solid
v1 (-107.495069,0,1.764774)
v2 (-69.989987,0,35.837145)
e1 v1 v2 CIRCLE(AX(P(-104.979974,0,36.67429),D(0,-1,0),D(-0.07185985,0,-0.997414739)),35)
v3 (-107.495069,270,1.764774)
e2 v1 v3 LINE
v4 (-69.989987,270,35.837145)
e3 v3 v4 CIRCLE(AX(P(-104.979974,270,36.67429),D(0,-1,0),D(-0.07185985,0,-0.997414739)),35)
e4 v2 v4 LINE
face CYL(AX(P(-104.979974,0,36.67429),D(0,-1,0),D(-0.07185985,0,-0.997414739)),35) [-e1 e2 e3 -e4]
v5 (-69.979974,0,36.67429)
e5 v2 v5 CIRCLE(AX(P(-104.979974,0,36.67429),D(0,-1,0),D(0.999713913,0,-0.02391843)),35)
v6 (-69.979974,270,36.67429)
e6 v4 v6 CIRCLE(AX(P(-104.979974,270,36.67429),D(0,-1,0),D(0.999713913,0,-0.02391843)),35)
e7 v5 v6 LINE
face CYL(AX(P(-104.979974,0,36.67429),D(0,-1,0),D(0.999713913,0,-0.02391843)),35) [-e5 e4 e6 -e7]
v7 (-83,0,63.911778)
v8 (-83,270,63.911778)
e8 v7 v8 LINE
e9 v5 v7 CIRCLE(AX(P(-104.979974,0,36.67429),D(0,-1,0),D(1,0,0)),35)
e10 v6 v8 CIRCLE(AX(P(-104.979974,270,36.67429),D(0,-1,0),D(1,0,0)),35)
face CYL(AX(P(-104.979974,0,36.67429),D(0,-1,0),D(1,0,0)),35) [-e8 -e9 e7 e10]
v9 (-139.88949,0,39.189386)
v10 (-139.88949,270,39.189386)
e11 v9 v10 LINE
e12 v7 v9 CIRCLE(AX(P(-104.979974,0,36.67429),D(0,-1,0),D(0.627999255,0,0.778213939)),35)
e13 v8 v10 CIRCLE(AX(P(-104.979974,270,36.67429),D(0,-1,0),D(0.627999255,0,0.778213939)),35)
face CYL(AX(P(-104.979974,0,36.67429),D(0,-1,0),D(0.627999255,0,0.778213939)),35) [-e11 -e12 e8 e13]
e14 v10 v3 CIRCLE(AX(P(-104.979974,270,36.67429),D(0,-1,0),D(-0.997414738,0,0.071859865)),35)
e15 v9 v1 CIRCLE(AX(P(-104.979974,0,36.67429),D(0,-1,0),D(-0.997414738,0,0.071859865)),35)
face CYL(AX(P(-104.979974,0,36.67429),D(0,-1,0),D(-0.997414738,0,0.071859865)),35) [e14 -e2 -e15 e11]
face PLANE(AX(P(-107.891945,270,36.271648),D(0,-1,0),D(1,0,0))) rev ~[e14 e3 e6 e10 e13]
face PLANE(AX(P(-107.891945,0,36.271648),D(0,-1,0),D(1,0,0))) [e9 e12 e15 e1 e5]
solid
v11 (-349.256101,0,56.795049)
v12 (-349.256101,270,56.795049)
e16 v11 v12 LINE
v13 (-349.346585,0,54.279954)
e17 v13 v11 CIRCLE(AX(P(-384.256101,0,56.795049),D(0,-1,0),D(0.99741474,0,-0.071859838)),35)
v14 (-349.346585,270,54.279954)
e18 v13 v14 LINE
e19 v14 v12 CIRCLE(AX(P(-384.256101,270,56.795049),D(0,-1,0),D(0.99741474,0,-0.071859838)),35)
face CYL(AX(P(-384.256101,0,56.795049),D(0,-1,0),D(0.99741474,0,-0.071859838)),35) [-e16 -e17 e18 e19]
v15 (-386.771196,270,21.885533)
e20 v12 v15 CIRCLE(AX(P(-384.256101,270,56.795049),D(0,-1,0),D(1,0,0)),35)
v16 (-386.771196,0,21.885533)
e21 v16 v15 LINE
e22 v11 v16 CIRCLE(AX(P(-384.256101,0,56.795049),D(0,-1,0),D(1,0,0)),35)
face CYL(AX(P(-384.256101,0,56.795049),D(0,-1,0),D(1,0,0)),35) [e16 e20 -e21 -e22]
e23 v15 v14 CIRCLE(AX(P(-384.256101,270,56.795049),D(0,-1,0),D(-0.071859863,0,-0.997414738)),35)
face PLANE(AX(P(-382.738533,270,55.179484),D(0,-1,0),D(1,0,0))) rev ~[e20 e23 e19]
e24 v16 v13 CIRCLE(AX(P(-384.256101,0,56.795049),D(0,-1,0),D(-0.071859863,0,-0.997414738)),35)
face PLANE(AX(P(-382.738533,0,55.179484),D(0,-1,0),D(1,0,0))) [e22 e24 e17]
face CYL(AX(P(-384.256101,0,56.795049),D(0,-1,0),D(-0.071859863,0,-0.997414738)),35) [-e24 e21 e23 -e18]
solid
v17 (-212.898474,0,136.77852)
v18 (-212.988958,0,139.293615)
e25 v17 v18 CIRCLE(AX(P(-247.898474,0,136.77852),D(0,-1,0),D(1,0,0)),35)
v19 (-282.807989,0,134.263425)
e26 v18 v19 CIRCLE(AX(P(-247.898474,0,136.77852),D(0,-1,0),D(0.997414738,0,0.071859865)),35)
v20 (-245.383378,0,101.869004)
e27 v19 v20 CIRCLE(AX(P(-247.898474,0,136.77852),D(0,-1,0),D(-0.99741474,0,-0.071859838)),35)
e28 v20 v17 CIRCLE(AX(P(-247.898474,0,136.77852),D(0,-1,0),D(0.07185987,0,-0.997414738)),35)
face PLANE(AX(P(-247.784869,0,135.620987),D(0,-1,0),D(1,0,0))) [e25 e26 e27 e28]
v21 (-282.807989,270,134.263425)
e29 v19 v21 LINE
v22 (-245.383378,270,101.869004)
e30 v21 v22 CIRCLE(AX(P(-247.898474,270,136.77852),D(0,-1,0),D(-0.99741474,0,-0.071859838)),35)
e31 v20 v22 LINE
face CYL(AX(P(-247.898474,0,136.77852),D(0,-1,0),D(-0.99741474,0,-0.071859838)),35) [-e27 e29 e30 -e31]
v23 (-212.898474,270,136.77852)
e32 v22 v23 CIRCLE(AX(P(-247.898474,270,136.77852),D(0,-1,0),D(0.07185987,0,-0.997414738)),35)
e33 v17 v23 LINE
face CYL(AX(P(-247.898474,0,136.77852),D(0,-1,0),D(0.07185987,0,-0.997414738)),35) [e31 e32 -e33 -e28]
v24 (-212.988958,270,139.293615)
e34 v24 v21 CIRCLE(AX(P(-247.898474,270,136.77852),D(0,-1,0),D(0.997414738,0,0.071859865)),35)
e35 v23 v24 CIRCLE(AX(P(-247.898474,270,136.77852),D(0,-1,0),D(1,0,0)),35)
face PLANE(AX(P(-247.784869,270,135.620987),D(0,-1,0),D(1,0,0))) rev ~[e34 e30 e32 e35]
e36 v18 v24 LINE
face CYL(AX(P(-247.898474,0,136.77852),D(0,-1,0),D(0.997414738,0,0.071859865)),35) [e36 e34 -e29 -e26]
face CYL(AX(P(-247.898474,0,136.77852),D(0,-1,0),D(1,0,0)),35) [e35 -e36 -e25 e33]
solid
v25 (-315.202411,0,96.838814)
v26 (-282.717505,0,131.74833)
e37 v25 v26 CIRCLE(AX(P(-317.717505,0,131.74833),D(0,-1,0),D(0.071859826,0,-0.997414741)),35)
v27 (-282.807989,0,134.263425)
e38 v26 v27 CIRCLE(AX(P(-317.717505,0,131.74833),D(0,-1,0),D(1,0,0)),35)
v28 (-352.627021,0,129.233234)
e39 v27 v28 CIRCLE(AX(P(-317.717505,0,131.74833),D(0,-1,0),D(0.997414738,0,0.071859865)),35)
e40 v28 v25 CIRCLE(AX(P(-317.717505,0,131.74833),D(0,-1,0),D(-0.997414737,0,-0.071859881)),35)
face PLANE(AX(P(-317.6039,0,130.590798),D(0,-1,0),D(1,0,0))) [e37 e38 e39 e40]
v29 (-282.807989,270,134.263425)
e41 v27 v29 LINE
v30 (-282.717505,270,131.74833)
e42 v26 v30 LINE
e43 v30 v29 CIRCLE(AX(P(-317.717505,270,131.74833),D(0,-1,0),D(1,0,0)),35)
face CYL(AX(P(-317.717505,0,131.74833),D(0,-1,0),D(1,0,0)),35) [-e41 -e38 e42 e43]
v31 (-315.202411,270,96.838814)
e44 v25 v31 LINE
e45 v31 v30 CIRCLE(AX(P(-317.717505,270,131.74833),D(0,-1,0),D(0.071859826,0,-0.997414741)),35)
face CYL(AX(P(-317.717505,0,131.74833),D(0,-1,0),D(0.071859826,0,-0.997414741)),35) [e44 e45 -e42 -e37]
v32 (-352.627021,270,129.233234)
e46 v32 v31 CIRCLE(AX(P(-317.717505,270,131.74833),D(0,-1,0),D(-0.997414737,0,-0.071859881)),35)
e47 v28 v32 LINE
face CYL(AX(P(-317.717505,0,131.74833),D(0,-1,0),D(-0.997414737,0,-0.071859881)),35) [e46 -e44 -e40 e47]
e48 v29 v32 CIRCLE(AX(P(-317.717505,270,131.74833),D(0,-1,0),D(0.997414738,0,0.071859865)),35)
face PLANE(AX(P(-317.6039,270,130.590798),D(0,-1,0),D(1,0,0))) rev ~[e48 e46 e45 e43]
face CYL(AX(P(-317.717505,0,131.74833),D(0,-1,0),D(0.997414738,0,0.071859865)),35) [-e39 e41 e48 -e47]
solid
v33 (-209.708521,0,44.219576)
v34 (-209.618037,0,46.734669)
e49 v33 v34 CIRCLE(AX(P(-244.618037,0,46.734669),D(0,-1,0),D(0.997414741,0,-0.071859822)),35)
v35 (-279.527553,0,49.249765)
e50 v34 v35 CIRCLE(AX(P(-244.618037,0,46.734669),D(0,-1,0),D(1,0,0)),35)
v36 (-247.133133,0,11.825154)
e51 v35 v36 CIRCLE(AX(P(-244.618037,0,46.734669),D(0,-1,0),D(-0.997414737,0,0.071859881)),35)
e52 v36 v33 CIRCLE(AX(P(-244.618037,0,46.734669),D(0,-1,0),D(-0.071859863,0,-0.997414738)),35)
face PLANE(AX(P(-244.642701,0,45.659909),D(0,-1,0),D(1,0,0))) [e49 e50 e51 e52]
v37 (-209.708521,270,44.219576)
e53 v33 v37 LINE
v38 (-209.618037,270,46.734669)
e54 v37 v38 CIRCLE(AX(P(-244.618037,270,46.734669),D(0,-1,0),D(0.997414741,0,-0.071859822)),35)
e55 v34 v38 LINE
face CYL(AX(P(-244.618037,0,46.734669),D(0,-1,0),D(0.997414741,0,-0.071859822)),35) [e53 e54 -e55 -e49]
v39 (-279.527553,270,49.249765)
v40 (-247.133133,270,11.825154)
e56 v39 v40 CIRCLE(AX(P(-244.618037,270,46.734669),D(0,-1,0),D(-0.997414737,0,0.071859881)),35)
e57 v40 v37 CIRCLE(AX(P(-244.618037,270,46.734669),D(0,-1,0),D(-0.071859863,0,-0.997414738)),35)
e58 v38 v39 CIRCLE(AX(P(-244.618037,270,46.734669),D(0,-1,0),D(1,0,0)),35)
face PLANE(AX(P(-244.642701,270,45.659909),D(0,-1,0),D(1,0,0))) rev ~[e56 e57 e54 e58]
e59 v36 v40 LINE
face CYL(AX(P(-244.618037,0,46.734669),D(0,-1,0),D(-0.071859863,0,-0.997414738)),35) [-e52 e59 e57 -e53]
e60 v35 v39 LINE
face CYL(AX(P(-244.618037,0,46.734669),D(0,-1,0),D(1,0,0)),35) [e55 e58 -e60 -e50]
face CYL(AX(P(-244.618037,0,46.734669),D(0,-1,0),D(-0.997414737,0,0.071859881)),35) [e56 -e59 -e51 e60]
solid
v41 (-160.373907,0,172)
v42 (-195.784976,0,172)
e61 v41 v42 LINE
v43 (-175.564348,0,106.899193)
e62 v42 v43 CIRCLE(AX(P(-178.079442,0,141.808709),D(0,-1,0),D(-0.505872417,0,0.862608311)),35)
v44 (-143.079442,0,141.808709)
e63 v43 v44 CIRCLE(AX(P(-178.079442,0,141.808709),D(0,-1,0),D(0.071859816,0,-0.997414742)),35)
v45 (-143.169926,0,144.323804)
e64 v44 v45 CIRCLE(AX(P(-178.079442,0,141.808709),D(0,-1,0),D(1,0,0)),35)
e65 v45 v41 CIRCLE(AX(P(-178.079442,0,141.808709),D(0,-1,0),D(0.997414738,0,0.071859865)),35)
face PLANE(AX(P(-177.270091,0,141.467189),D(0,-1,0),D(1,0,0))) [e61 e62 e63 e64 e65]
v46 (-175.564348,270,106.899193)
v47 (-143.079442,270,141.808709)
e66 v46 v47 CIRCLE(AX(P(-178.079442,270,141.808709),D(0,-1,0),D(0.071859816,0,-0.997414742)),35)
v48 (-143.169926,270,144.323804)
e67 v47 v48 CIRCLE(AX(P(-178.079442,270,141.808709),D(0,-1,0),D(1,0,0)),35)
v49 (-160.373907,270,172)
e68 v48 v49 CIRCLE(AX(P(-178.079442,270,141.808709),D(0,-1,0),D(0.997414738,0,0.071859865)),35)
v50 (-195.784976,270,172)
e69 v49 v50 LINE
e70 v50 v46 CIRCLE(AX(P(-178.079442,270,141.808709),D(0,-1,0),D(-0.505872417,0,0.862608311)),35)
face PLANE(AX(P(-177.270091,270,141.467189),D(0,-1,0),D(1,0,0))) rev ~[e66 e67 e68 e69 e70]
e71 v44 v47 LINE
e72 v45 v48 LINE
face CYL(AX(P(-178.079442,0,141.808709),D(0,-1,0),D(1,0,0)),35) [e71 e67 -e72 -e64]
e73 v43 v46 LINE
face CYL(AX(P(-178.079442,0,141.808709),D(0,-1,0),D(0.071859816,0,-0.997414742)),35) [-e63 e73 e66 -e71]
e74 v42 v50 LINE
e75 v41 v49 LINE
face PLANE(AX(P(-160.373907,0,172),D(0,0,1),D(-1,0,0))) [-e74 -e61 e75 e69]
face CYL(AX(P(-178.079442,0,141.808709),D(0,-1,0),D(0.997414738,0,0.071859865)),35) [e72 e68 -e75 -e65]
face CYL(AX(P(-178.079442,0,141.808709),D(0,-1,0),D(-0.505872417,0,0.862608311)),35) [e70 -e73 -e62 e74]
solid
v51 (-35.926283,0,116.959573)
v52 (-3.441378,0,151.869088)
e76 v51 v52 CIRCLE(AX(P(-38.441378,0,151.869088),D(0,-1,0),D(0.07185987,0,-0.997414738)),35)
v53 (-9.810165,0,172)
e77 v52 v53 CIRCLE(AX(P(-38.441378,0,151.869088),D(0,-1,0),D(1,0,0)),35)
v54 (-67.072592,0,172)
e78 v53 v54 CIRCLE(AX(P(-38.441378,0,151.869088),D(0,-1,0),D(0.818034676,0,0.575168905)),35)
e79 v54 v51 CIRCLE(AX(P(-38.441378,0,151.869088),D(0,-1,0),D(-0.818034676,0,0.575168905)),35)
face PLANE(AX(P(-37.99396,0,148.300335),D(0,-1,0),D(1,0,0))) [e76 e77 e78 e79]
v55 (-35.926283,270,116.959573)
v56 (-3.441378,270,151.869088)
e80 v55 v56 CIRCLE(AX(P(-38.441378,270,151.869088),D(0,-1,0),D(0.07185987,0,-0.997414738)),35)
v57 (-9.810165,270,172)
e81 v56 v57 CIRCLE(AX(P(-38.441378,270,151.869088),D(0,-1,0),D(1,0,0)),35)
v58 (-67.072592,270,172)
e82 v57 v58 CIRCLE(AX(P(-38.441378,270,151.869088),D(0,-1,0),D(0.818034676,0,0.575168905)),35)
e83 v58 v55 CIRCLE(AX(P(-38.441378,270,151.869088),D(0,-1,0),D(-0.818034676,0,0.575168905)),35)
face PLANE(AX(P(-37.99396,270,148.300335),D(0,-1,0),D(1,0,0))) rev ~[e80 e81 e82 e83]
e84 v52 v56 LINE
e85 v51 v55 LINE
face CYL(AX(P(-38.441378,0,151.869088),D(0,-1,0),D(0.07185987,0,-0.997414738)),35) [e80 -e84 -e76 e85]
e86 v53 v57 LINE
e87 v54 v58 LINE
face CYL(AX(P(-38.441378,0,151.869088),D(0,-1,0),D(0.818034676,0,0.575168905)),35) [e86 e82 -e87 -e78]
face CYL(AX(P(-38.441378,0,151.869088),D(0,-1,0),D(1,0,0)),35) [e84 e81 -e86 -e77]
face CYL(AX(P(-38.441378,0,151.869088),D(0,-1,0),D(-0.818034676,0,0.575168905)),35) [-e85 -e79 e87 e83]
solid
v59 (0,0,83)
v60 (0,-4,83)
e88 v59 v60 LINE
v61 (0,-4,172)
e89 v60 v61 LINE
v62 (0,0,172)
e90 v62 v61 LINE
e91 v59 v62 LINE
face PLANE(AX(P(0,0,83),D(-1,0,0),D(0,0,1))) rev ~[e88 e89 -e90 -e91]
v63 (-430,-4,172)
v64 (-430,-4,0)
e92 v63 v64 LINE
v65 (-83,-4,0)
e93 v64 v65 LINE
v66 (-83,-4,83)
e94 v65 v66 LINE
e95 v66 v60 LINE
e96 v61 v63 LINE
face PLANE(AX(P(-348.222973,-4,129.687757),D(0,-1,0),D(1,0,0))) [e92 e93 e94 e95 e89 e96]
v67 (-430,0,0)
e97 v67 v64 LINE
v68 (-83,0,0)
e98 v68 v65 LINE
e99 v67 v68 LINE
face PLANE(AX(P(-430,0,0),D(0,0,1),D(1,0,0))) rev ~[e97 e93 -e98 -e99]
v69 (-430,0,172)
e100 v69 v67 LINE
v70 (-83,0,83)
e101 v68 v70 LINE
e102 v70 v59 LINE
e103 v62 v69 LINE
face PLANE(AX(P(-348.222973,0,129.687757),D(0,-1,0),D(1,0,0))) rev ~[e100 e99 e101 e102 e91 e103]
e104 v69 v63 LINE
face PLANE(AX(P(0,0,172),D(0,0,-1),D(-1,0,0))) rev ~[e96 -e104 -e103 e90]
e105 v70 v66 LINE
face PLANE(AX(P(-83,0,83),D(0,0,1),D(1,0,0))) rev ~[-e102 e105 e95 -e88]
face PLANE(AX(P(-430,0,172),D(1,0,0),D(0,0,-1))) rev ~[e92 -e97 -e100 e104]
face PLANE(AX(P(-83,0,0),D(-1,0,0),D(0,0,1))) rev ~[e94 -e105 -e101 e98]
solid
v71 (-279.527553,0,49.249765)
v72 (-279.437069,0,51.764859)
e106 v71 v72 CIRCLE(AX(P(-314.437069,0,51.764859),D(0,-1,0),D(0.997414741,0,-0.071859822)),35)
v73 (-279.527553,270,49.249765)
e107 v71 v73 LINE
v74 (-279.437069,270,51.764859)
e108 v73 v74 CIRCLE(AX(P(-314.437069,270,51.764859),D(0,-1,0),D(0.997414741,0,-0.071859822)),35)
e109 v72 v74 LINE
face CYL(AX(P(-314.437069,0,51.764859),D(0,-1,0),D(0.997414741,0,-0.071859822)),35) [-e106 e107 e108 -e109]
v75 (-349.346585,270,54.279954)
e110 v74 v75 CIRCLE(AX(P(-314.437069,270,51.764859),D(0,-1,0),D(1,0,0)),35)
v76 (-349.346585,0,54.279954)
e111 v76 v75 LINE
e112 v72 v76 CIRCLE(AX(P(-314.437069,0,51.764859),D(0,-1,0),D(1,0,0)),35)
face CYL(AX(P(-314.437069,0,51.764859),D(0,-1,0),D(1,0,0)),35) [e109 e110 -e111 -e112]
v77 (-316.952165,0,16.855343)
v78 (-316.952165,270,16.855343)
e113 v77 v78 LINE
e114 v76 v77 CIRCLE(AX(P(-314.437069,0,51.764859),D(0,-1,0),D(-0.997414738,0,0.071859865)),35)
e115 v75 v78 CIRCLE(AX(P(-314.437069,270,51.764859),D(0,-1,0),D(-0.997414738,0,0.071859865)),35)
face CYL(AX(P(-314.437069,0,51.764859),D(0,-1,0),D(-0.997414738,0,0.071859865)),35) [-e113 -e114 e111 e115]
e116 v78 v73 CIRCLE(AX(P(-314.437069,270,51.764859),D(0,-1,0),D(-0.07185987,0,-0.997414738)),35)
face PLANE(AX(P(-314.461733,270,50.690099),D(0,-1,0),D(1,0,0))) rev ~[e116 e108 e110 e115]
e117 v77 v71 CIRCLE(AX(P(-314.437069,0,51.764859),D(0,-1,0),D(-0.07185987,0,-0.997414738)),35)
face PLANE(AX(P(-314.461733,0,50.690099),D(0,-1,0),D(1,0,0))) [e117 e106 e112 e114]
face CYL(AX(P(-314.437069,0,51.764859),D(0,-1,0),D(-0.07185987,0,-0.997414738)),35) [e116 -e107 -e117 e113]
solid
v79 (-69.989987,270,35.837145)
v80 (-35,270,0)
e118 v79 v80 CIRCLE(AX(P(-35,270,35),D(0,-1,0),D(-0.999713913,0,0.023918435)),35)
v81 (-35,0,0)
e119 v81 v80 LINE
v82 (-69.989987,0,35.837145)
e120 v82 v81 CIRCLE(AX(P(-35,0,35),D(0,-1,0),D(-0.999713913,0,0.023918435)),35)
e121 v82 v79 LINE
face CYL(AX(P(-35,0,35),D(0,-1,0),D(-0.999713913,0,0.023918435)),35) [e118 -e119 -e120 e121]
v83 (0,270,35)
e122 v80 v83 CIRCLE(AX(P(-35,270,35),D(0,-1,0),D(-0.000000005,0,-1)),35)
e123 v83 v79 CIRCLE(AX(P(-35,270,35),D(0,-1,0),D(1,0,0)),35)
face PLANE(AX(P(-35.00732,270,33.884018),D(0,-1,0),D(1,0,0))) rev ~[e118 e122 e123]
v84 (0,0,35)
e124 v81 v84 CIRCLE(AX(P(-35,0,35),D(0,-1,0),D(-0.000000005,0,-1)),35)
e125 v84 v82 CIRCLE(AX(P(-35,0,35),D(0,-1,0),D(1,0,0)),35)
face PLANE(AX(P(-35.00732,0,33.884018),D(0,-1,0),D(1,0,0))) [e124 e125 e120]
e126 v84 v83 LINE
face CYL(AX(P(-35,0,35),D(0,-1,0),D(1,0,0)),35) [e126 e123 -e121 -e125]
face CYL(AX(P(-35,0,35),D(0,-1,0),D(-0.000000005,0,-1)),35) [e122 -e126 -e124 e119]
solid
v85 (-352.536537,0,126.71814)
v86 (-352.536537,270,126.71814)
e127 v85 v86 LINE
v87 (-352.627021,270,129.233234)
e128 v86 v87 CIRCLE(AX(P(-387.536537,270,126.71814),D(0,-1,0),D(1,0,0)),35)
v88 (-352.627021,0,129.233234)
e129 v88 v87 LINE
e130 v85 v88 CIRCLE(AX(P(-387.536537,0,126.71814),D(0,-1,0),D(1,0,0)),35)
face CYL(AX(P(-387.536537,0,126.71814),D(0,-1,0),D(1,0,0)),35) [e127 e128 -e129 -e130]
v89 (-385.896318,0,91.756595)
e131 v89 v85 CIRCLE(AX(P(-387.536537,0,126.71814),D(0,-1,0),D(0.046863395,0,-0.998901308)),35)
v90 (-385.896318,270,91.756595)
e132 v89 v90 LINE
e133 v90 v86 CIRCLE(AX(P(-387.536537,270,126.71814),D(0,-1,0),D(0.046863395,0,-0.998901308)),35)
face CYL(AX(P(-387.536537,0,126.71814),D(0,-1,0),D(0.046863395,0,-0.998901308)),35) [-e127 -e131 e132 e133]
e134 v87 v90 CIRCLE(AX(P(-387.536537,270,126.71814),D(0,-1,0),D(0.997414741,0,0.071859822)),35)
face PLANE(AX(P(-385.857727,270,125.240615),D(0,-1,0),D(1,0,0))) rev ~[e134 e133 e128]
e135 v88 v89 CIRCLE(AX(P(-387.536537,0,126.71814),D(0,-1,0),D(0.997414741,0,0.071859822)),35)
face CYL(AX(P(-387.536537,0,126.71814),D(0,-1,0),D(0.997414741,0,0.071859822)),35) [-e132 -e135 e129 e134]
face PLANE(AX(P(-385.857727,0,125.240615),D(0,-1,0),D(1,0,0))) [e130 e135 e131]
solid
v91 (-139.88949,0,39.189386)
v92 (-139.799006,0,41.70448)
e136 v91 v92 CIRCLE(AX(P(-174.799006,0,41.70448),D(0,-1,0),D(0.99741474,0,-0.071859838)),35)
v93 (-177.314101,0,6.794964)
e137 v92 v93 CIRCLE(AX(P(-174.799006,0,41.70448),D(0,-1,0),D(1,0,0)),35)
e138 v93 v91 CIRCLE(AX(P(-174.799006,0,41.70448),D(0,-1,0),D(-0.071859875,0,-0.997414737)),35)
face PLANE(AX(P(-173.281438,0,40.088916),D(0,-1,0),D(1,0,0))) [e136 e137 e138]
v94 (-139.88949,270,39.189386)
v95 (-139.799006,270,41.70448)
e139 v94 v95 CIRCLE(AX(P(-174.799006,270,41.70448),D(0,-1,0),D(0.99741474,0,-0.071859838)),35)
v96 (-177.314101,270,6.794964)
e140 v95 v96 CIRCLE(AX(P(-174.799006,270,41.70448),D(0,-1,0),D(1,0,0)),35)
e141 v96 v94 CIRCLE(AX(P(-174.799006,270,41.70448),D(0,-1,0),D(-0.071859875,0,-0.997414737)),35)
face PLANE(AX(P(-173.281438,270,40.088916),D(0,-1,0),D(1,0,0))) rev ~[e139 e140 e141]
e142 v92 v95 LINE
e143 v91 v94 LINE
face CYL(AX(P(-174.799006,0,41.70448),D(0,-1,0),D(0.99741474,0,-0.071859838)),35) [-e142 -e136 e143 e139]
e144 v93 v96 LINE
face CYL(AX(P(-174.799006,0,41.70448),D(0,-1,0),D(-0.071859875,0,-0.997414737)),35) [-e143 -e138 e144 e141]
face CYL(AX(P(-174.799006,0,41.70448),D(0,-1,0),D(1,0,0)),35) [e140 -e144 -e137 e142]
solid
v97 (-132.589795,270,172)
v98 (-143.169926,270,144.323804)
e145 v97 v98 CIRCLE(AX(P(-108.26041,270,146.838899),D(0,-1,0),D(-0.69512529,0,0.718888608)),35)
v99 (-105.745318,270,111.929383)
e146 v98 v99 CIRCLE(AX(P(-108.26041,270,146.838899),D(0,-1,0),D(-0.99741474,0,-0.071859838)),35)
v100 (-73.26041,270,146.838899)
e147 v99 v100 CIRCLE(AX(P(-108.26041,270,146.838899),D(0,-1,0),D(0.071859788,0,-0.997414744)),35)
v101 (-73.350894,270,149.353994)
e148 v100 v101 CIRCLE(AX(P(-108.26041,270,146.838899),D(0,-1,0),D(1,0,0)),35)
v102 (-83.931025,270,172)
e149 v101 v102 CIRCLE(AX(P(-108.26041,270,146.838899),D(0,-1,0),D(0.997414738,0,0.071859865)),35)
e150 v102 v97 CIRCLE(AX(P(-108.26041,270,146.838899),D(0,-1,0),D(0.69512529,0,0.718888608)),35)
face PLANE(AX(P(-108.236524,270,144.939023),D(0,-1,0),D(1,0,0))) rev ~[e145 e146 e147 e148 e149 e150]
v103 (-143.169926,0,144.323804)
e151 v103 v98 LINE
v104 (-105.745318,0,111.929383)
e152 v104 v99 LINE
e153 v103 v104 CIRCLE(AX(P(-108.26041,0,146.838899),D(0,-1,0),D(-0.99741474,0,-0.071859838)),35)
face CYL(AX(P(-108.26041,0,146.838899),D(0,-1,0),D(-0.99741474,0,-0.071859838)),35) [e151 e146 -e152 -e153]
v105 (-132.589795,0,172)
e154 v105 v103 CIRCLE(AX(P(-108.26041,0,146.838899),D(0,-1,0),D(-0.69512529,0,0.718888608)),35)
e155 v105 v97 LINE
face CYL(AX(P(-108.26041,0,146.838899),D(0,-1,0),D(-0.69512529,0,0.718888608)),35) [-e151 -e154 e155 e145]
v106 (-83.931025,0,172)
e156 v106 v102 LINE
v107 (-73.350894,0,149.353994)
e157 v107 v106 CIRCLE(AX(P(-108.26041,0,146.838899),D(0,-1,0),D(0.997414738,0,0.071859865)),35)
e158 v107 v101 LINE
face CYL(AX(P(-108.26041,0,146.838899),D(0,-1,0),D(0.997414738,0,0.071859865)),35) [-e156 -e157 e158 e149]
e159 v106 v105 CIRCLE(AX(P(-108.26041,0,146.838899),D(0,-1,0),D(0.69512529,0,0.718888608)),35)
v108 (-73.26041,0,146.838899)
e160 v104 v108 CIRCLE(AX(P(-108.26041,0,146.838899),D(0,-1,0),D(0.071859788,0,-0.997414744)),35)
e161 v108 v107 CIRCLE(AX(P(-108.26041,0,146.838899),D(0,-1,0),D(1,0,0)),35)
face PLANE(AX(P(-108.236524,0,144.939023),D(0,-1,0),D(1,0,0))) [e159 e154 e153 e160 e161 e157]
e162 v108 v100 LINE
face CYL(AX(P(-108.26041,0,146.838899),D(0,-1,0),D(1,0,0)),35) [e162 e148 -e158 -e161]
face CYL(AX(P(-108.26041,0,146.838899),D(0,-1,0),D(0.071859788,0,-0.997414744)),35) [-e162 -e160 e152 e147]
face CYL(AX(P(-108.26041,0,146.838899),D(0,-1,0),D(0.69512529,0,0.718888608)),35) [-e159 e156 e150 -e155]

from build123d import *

# Parameters (mm, degrees)
F1_DEPTH = 4
F2_DEPTH = 270


with BuildPart() as f1:
    # F0 (on Front) → F1 (new body)
    with BuildSketch(Plane.XZ):
        with BuildLine():
            Line((-195.7849764046, 172), (-430, 172))
            Line((-430, 172), (-430, 25))
            Line((-430, 25), (-386.7711960698, 21.8855328581))
            ThreePointArc((-386.7711960698, 21.8855328581), (-419.2533574917, 57.2332605199), (-385.8963182023, 91.7565945325))
            ThreePointArc((-385.8963182023, 91.7565945325), (-413.7108642591, 149.9539874789), (-352.6270210914, 129.2332340666))
            ThreePointArc((-352.6270210914, 129.2332340666), (-320.2326008573, 166.6578457159), (-282.8079894646, 134.2634251853))
            ThreePointArc((-282.8079894646, 134.2634251853), (-250.4135683653, 171.6880353767), (-212.9889577288, 139.2936147916))
            ThreePointArc((-212.9889577288, 139.2936147916), (-209.055445323, 158.102487295), (-195.7849764046, 172))
        make_face()
        with BuildLine():
            Line((-160.373907248, 172), (-195.7849764046, 172))
            ThreePointArc((-195.7849764046, 172), (-209.055445323, 158.102487295), (-212.9889577288, 139.2936147916))
            ThreePointArc((-212.9889577288, 139.2936147916), (-200.9857572933, 115.3455136972), (-175.5643482834, 106.8991931564))
            ThreePointArc((-175.5643482834, 106.8991931564), (-152.4569100037, 117.9657675391), (-143.0794418263, 141.8087091151))
            ThreePointArc((-143.0794418263, 141.8087091151), (-143.1020701829, 143.0670703178), (-143.169925993, 144.3238043979))
            ThreePointArc((-143.169925993, 144.3238043979), (-148.3543878616, 160.286294639), (-160.373907248, 172))
        make_face()
        Polygon((-386.7711960698, 21.8855328581), (-430, 25), (-430, 0), (-83, 0), (-107.4950686991, 1.764774402), (-177.3141012878, 6.7949640697), (-247.1331326016, 11.8251536457), (-316.9521645982, 16.8553432708), align=None)
        with BuildLine():
            Line((-132.5897952544, 172), (-160.373907248, 172))
            ThreePointArc((-160.373907248, 172), (-148.3543878616, 160.286294639), (-143.169925993, 144.3238043979))
            ThreePointArc((-143.169925993, 144.3238043979), (-140.9529902982, 159.3367065037), (-132.5897952544, 172))
        make_face()
        with BuildLine():
            ThreePointArc((-175.5643482834, 106.8991931564), (-200.9857572933, 115.3455136972), (-212.9889577288, 139.2936147916))
            ThreePointArc((-212.9889577288, 139.2936147916), (-212.9211019187, 138.0368807115), (-212.8984735621, 136.7785195088))
            ThreePointArc((-212.8984735621, 136.7785195088), (-222.2759410866, 112.9355786344), (-245.3833781073, 101.8690036878))
            Line((-245.3833781073, 101.8690036878), (-175.5643482834, 106.8991931564))
        make_face()
        with BuildLine():
            ThreePointArc((-212.8984735621, 136.7785195088), (-212.9211019187, 138.0368807115), (-212.9889577288, 139.2936147916))
            ThreePointArc((-212.9889577288, 139.2936147916), (-250.4135683653, 171.6880353767), (-282.8079894646, 134.2634251853))
            ThreePointArc((-282.8079894646, 134.2634251853), (-270.8047883044, 110.3153234636), (-245.3833781073, 101.8690036878))
            ThreePointArc((-245.3833781073, 101.8690036878), (-222.2759410866, 112.9355786344), (-212.8984735621, 136.7785195088))
        make_face()
        with BuildLine():
            ThreePointArc((-349.3465849767, 54.2799543745), (-361.3497860368, 30.3318527395), (-386.7711960698, 21.8855328581))
            Line((-386.7711960698, 21.8855328581), (-316.9521645982, 16.8553432708))
            ThreePointArc((-316.9521645982, 16.8553432708), (-340.9002655033, 28.858544713), (-349.3465849767, 54.2799543745))
        make_face()
        with BuildLine():
            ThreePointArc((-385.8963182023, 91.7565945325), (-419.2533574917, 57.2332605199), (-386.7711960698, 21.8855328581))
            ThreePointArc((-386.7711960698, 21.8855328581), (-361.3497860368, 30.3318527395), (-349.3465849767, 54.2799543745))
            ThreePointArc((-349.3465849767, 54.2799543745), (-349.2787292185, 55.5366879759), (-349.2561008792, 56.795048698))
            ThreePointArc((-349.2561008792, 56.795048698), (-360.0942260172, 82.1170510508), (-385.8963182023, 91.7565945325))
        make_face()
        with BuildLine():
            Line((-83.9310249267, 172), (-132.5897952544, 172))
            ThreePointArc((-132.5897952544, 172), (-140.9529902982, 159.3367065037), (-143.169925993, 144.3238043979))
            ThreePointArc((-143.169925993, 144.3238043979), (-131.166725929, 120.3757036251), (-105.7453175279, 111.9293826921))
            ThreePointArc((-105.7453175279, 111.9293826921), (-82.6378786027, 122.9959567856), (-73.2604100905, 146.8388987214))
            ThreePointArc((-73.2604100905, 146.8388987214), (-73.2830384471, 148.0972599242), (-73.3508942572, 149.3539940042))
            ThreePointArc((-73.3508942572, 149.3539940042), (-76.5504393443, 161.6536803692), (-83.9310249267, 172))
        make_face()
        with BuildLine():
            ThreePointArc((-105.7453175279, 111.9293826921), (-131.166725929, 120.3757036251), (-143.169925993, 144.3238043979))
            ThreePointArc((-143.169925993, 144.3238043979), (-143.1020701829, 143.0670703178), (-143.0794418263, 141.8087091151))
            ThreePointArc((-143.0794418263, 141.8087091151), (-152.4569100037, 117.9657675391), (-175.5643482834, 106.8991931564))
            Line((-175.5643482834, 106.8991931564), (-105.7453175279, 111.9293826921))
        make_face()
        with BuildLine():
            ThreePointArc((-245.3833781073, 101.8690036878), (-270.8047883044, 110.3153234636), (-282.8079894646, 134.2634251853))
            ThreePointArc((-282.8079894646, 134.2634251853), (-282.7401336545, 133.0066911052), (-282.7175052979, 131.7483299025))
            ThreePointArc((-282.7175052979, 131.7483299025), (-292.0949733471, 107.9053884642), (-315.2024113796, 96.8388139708))
            Line((-315.2024113796, 96.8388139708), (-245.3833781073, 101.8690036878))
        make_face()
        with BuildLine():
            ThreePointArc((-282.7175052979, 131.7483299025), (-282.7401336545, 133.0066911052), (-282.8079894646, 134.2634251853))
            ThreePointArc((-282.8079894646, 134.2634251853), (-320.2326008573, 166.6578457159), (-352.6270210914, 129.2332340666))
            ThreePointArc((-352.6270210914, 129.2332340666), (-340.6238200494, 105.2851338652), (-315.2024113796, 96.8388139708))
            ThreePointArc((-315.2024113796, 96.8388139708), (-292.0949733471, 107.9053884642), (-282.7175052979, 131.7483299025))
        make_face()
        with BuildLine():
            Line((-105.7453175279, 111.9293826921), (-175.5643482834, 106.8991931564))
            Line((-175.5643482834, 106.8991931564), (-245.3833781073, 101.8690036878))
            Line((-245.3833781073, 101.8690036878), (-315.2024113796, 96.8388139708))
            ThreePointArc((-315.2024113796, 96.8388139708), (-340.6238200494, 105.2851338652), (-352.6270210914, 129.2332340666))
            ThreePointArc((-352.6270210914, 129.2332340666), (-352.559165363, 127.9765007412), (-352.5365370337, 126.7181402961))
            ThreePointArc((-352.5365370337, 126.7181402961), (-362.2145341598, 102.5562659804), (-385.8963182023, 91.7565945325))
            ThreePointArc((-385.8963182023, 91.7565945325), (-360.0942260172, 82.1170510508), (-349.2561008792, 56.795048698))
            ThreePointArc((-349.2561008792, 56.795048698), (-349.2787292185, 55.5366879759), (-349.3465849767, 54.2799543745))
            ThreePointArc((-349.3465849767, 54.2799543745), (-313.1787079407, 86.7422307352), (-279.4370691434, 51.7648590917))
            ThreePointArc((-279.4370691434, 51.7648590917), (-279.4596974729, 50.5064986405), (-279.527553202, 49.249765309))
            ThreePointArc((-279.527553202, 49.249765309), (-243.359675934, 81.7120411191), (-209.6180374076, 46.7346694854))
            ThreePointArc((-209.6180374076, 46.7346694854), (-209.6406657369, 45.4763090403), (-209.7085214653, 44.2195757149))
            ThreePointArc((-209.7085214653, 44.2195757149), (-173.540644192, 76.6818515125), (-139.7990056718, 41.7044798791))
            ThreePointArc((-139.7990056718, 41.7044798791), (-139.8216340111, 40.4461191571), (-139.8894897693, 39.189385556))
            ThreePointArc((-139.8894897693, 39.189385556), (-118.9296132608, 68.7742523087), (-83, 63.9117781483))
            Line((-83, 63.9117781483), (-83, 83))
            Line((-83, 83), (0, 83))
            Line((0, 83), (0, 119.5479214189))
            Line((0, 119.5479214189), (-35.9262829, 116.9595725068))
            Line((-35.9262829, 116.9595725068), (-105.7453175279, 111.9293826921))
        make_face()
        with BuildLine():
            Line((-107.4950686991, 1.764774402), (-83, 0))
            Line((-83, 0), (-83, 9.4368023971))
            ThreePointArc((-83, 9.4368023971), (-94.5188371099, 3.2742211664), (-107.4950686991, 1.764774402))
        make_face()
        with BuildLine():
            ThreePointArc((-279.527553202, 49.249765309), (-291.5307541961, 25.3016632239), (-316.9521645982, 16.8553432708))
            Line((-316.9521645982, 16.8553432708), (-247.1331326016, 11.8251536457))
            ThreePointArc((-247.1331326016, 11.8251536457), (-271.0812338594, 23.8283552128), (-279.527553202, 49.249765309))
        make_face()
        with BuildLine():
            ThreePointArc((-349.3465849767, 54.2799543745), (-340.9002655033, 28.858544713), (-316.9521645982, 16.8553432708))
            ThreePointArc((-316.9521645982, 16.8553432708), (-291.5307541961, 25.3016632239), (-279.527553202, 49.249765309))
            ThreePointArc((-279.527553202, 49.249765309), (-279.4596974729, 50.5064986405), (-279.4370691434, 51.7648590917))
            ThreePointArc((-279.4370691434, 51.7648590917), (-313.1787079407, 86.7422307352), (-349.3465849767, 54.2799543745))
        make_face()
        with BuildLine():
            ThreePointArc((-352.6270210914, 129.2332340666), (-413.7108642591, 149.9539874789), (-385.8963182023, 91.7565945325))
            ThreePointArc((-385.8963182023, 91.7565945325), (-362.2145341598, 102.5562659804), (-352.5365370337, 126.7181402961))
            ThreePointArc((-352.5365370337, 126.7181402961), (-352.559165363, 127.9765007412), (-352.6270210914, 129.2332340666))
        make_face()
        with BuildLine():
            Line((-67.0725920077, 172), (-83.9310249267, 172))
            ThreePointArc((-83.9310249267, 172), (-76.5504393443, 161.6536803692), (-73.3508942572, 149.3539940042))
            ThreePointArc((-73.3508942572, 149.3539940042), (-72.1692077394, 161.2196778814), (-67.0725920077, 172))
        make_face()
        with BuildLine():
            ThreePointArc((-73.2604100905, 146.8388987214), (-82.6378786027, 122.9959567856), (-105.7453175279, 111.9293826921))
            Line((-105.7453175279, 111.9293826921), (-35.9262829, 116.9595725068))
            ThreePointArc((-35.9262829, 116.9595725068), (-61.347693097, 125.4058922826), (-73.3508942572, 149.3539940042))
            ThreePointArc((-73.3508942572, 149.3539940042), (-73.2830384471, 148.0972599242), (-73.2604100905, 146.8388987214))
        make_face()
        with BuildLine():
            Line((-177.3141012878, 6.7949640697), (-107.4950686991, 1.764774402))
            ThreePointArc((-107.4950686991, 1.764774402), (-131.4431700691, 13.767975632), (-139.8894897693, 39.189385556))
            ThreePointArc((-139.8894897693, 39.189385556), (-151.8926909904, 15.2412837811), (-177.3141012878, 6.7949640697))
        make_face()
        with BuildLine():
            ThreePointArc((-139.8894897693, 39.189385556), (-131.4431700691, 13.767975632), (-107.4950686991, 1.764774402))
            ThreePointArc((-107.4950686991, 1.764774402), (-94.5188371099, 3.2742211664), (-83, 9.4368023971))
            Line((-83, 9.4368023971), (-83, 63.9117781483))
            ThreePointArc((-83, 63.9117781483), (-118.9296132608, 68.7742523087), (-139.8894897693, 39.189385556))
        make_face()
        with BuildLine():
            ThreePointArc((-279.527553202, 49.249765309), (-271.0812338594, 23.8283552128), (-247.1331326016, 11.8251536457))
            ThreePointArc((-247.1331326016, 11.8251536457), (-221.7117223568, 20.2714737072), (-209.7085214653, 44.2195757149))
            ThreePointArc((-209.7085214653, 44.2195757149), (-209.6406657369, 45.4763090403), (-209.6180374076, 46.7346694854))
            ThreePointArc((-209.6180374076, 46.7346694854), (-243.359675934, 81.7120411191), (-279.527553202, 49.249765309))
        make_face()
        with BuildLine():
            ThreePointArc((-209.7085214653, 44.2195757149), (-221.7117223568, 20.2714737072), (-247.1331326016, 11.8251536457))
            Line((-247.1331326016, 11.8251536457), (-177.3141012878, 6.7949640697))
            ThreePointArc((-177.3141012878, 6.7949640697), (-201.2622022661, 18.7981657711), (-209.7085214653, 44.2195757149))
        make_face()
        with BuildLine():
            Line((-9.8101647017, 172), (-67.0725920077, 172))
            ThreePointArc((-67.0725920077, 172), (-72.1692077394, 161.2196778814), (-73.3508942572, 149.3539940042))
            ThreePointArc((-73.3508942572, 149.3539940042), (-61.347693097, 125.4058922826), (-35.9262829, 116.9595725068))
            ThreePointArc((-35.9262829, 116.9595725068), (-12.8188458792, 128.0261474533), (-3.4413783547, 151.8690883278))
            ThreePointArc((-3.4413783547, 151.8690883278), (-5.0715380955, 162.426254665), (-9.8101647017, 172))
        make_face()
        with BuildLine():
            ThreePointArc((-3.4413783547, 151.8690883278), (-12.8188458792, 128.0261474533), (-35.9262829, 116.9595725068))
            Line((-35.9262829, 116.9595725068), (0, 119.5479214189))
            Line((0, 119.5479214189), (0, 172))
            Line((0, 172), (-9.8101647017, 172))
            ThreePointArc((-9.8101647017, 172), (-5.0715380955, 162.426254665), (-3.4413783547, 151.8690883278))
        make_face()
        with BuildLine():
            ThreePointArc((-177.3141012878, 6.7949640697), (-151.8926909904, 15.2412837811), (-139.8894897693, 39.189385556))
            ThreePointArc((-139.8894897693, 39.189385556), (-139.8216340111, 40.4461191571), (-139.7990056718, 41.7044798791))
            ThreePointArc((-139.7990056718, 41.7044798791), (-173.540644192, 76.6818515125), (-209.7085214653, 44.2195757149))
            ThreePointArc((-209.7085214653, 44.2195757149), (-201.2622022661, 18.7981657711), (-177.3141012878, 6.7949640697))
        make_face()
    extrude(amount=F1_DEPTH)


with BuildPart() as f2:
    # F0 (on Front) → F2 (new body)
    with BuildSketch(Plane.XZ):
        with BuildLine():
            ThreePointArc((-385.8963182023, 91.7565945325), (-419.2533574917, 57.2332605199), (-386.7711960698, 21.8855328581))
            ThreePointArc((-386.7711960698, 21.8855328581), (-361.3497860368, 30.3318527395), (-349.3465849767, 54.2799543745))
            ThreePointArc((-349.3465849767, 54.2799543745), (-349.2787292185, 55.5366879759), (-349.2561008792, 56.795048698))
            ThreePointArc((-349.2561008792, 56.795048698), (-360.0942260172, 82.1170510508), (-385.8963182023, 91.7565945325))
        make_face()
    extrude(amount=-F2_DEPTH)


with BuildPart() as f2b:
    # F0 (on Front) → F2, piece 2 (new body)
    with BuildSketch(Plane.XZ):
        with BuildLine():
            ThreePointArc((-349.3465849767, 54.2799543745), (-340.9002655033, 28.858544713), (-316.9521645982, 16.8553432708))
            ThreePointArc((-316.9521645982, 16.8553432708), (-291.5307541961, 25.3016632239), (-279.527553202, 49.249765309))
            ThreePointArc((-279.527553202, 49.249765309), (-279.4596974729, 50.5064986405), (-279.4370691434, 51.7648590917))
            ThreePointArc((-279.4370691434, 51.7648590917), (-313.1787079407, 86.7422307352), (-349.3465849767, 54.2799543745))
        make_face()
    extrude(amount=-F2_DEPTH)


with BuildPart() as f2c:
    # F0 (on Front) → F2, piece 3 (new body)
    with BuildSketch(Plane.XZ):
        with BuildLine():
            ThreePointArc((-279.527553202, 49.249765309), (-271.0812338594, 23.8283552128), (-247.1331326016, 11.8251536457))
            ThreePointArc((-247.1331326016, 11.8251536457), (-221.7117223568, 20.2714737072), (-209.7085214653, 44.2195757149))
            ThreePointArc((-209.7085214653, 44.2195757149), (-209.6406657369, 45.4763090403), (-209.6180374076, 46.7346694854))
            ThreePointArc((-209.6180374076, 46.7346694854), (-243.359675934, 81.7120411191), (-279.527553202, 49.249765309))
        make_face()
    extrude(amount=-F2_DEPTH)


with BuildPart() as f2d:
    # F0 (on Front) → F2, piece 4 (new body)
    with BuildSketch(Plane.XZ):
        with BuildLine():
            ThreePointArc((-177.3141012878, 6.7949640697), (-151.8926909904, 15.2412837811), (-139.8894897693, 39.189385556))
            ThreePointArc((-139.8894897693, 39.189385556), (-139.8216340111, 40.4461191571), (-139.7990056718, 41.7044798791))
            ThreePointArc((-139.7990056718, 41.7044798791), (-173.540644192, 76.6818515125), (-209.7085214653, 44.2195757149))
            ThreePointArc((-209.7085214653, 44.2195757149), (-201.2622022661, 18.7981657711), (-177.3141012878, 6.7949640697))
        make_face()
    extrude(amount=-F2_DEPTH)


with BuildPart() as f2e:
    # F0 (on Front) → F2, piece 5 (new body)
    with BuildSketch(Plane.XZ):
        with BuildLine():
            ThreePointArc((-139.8894897693, 39.189385556), (-131.4431700691, 13.767975632), (-107.4950686991, 1.764774402))
            ThreePointArc((-107.4950686991, 1.764774402), (-94.5188371099, 3.2742211664), (-83, 9.4368023971))
            Line((-83, 9.4368023971), (-83, 63.9117781483))
            ThreePointArc((-83, 63.9117781483), (-118.9296132608, 68.7742523087), (-139.8894897693, 39.189385556))
        make_face()
        with BuildLine():
            Line((-83, 63.9117781483), (-83, 9.4368023971))
            ThreePointArc((-83, 9.4368023971), (-73.5850916032, 21.2029825287), (-69.989986966, 35.8371452194))
            ThreePointArc((-69.989986966, 35.8371452194), (-69.982477283, 36.2556878059), (-69.979973936, 36.6742902727))
            ThreePointArc((-69.979973936, 36.6742902727), (-73.402299166, 51.7690064383), (-83, 63.9117781483))
        make_face()
    extrude(amount=-F2_DEPTH)


with BuildPart() as f2f:
    # F0 (on Front) → F2, piece 6 (new body)
    with BuildSketch(Plane.XZ):
        with BuildLine():
            ThreePointArc((-69.989986966, 35.8371452194), (-60.0429639642, 10.5490295512), (-35.0000001584, 0))
            ThreePointArc((-35.0000001584, 0), (-10.2512627145, 10.2512626025), (0, 35))
            ThreePointArc((0, 35), (-34.5813974501, 69.997496652), (-69.989986966, 35.8371452194))
        make_face()
    extrude(amount=-F2_DEPTH)


with BuildPart() as f2g:
    # F0 (on Front) → F2, piece 7 (new body)
    with BuildSketch(Plane.XZ):
        with BuildLine():
            Line((-9.8101647017, 172), (-67.0725920077, 172))
            ThreePointArc((-67.0725920077, 172), (-72.1692077394, 161.2196778814), (-73.3508942572, 149.3539940042))
            ThreePointArc((-73.3508942572, 149.3539940042), (-61.347693097, 125.4058922826), (-35.9262829, 116.9595725068))
            ThreePointArc((-35.9262829, 116.9595725068), (-12.8188458792, 128.0261474533), (-3.4413783547, 151.8690883278))
            ThreePointArc((-3.4413783547, 151.8690883278), (-5.0715380955, 162.426254665), (-9.8101647017, 172))
        make_face()
        with BuildLine():
            ThreePointArc((-9.8101647017, 172), (-38.4413783547, 186.8690883278), (-67.0725920077, 172))
            Line((-67.0725920077, 172), (-9.8101647017, 172))
        make_face()
    extrude(amount=-F2_DEPTH)


with BuildPart() as f2h:
    # F0 (on Front) → F2, piece 8 (new body)
    with BuildSketch(Plane.XZ):
        with BuildLine():
            Line((-160.373907248, 172), (-195.7849764046, 172))
            ThreePointArc((-195.7849764046, 172), (-209.055445323, 158.102487295), (-212.9889577288, 139.2936147916))
            ThreePointArc((-212.9889577288, 139.2936147916), (-200.9857572933, 115.3455136972), (-175.5643482834, 106.8991931564))
            ThreePointArc((-175.5643482834, 106.8991931564), (-152.4569100037, 117.9657675391), (-143.0794418263, 141.8087091151))
            ThreePointArc((-143.0794418263, 141.8087091151), (-143.1020701829, 143.0670703178), (-143.169925993, 144.3238043979))
            ThreePointArc((-143.169925993, 144.3238043979), (-148.3543878616, 160.286294639), (-160.373907248, 172))
        make_face()
    extrude(amount=-F2_DEPTH)


with BuildPart() as f2i:
    # F0 (on Front) → F2, piece 9 (new body)
    with BuildSketch(Plane.XZ):
        with BuildLine():
            ThreePointArc((-212.8984735621, 136.7785195088), (-212.9211019187, 138.0368807115), (-212.9889577288, 139.2936147916))
            ThreePointArc((-212.9889577288, 139.2936147916), (-250.4135683653, 171.6880353767), (-282.8079894646, 134.2634251853))
            ThreePointArc((-282.8079894646, 134.2634251853), (-270.8047883044, 110.3153234636), (-245.3833781073, 101.8690036878))
            ThreePointArc((-245.3833781073, 101.8690036878), (-222.2759410866, 112.9355786344), (-212.8984735621, 136.7785195088))
        make_face()
    extrude(amount=-F2_DEPTH)


with BuildPart() as f2j:
    # F0 (on Front) → F2, piece 10 (new body)
    with BuildSketch(Plane.XZ):
        with BuildLine():
            ThreePointArc((-282.7175052979, 131.7483299025), (-282.7401336545, 133.0066911052), (-282.8079894646, 134.2634251853))
            ThreePointArc((-282.8079894646, 134.2634251853), (-320.2326008573, 166.6578457159), (-352.6270210914, 129.2332340666))
            ThreePointArc((-352.6270210914, 129.2332340666), (-340.6238200494, 105.2851338652), (-315.2024113796, 96.8388139708))
            ThreePointArc((-315.2024113796, 96.8388139708), (-292.0949733471, 107.9053884642), (-282.7175052979, 131.7483299025))
        make_face()
    extrude(amount=-F2_DEPTH)


with BuildPart() as f2k:
    # F0 (on Front) → F2, piece 11 (new body)
    with BuildSketch(Plane.XZ):
        with BuildLine():
            ThreePointArc((-352.6270210914, 129.2332340666), (-413.7108642591, 149.9539874789), (-385.8963182023, 91.7565945325))
            ThreePointArc((-385.8963182023, 91.7565945325), (-362.2145341598, 102.5562659804), (-352.5365370337, 126.7181402961))
            ThreePointArc((-352.5365370337, 126.7181402961), (-352.559165363, 127.9765007412), (-352.6270210914, 129.2332340666))
        make_face()
    extrude(amount=-F2_DEPTH)


with BuildPart() as f2l:
    # F0 (on Front) → F2, piece 12 (new body)
    with BuildSketch(Plane.XZ):
        with BuildLine():
            Line((-83.9310249267, 172), (-132.5897952544, 172))
            ThreePointArc((-132.5897952544, 172), (-140.9529902982, 159.3367065037), (-143.169925993, 144.3238043979))
            ThreePointArc((-143.169925993, 144.3238043979), (-131.166725929, 120.3757036251), (-105.7453175279, 111.9293826921))
            ThreePointArc((-105.7453175279, 111.9293826921), (-82.6378786027, 122.9959567856), (-73.2604100905, 146.8388987214))
            ThreePointArc((-73.2604100905, 146.8388987214), (-73.2830384471, 148.0972599242), (-73.3508942572, 149.3539940042))
            ThreePointArc((-73.3508942572, 149.3539940042), (-76.5504393443, 161.6536803692), (-83.9310249267, 172))
        make_face()
        with BuildLine():
            ThreePointArc((-83.9310249267, 172), (-108.2604100905, 181.8388987214), (-132.5897952544, 172))
            Line((-132.5897952544, 172), (-83.9310249267, 172))
        make_face()
    extrude(amount=-F2_DEPTH)


solid = Compound([f1.part, f2.part, f2b.part, f2c.part, f2d.part, f2e.part, f2f.part, f2g.part, f2h.part, f2i.part, f2j.part, f2k.part, f2l.part])
